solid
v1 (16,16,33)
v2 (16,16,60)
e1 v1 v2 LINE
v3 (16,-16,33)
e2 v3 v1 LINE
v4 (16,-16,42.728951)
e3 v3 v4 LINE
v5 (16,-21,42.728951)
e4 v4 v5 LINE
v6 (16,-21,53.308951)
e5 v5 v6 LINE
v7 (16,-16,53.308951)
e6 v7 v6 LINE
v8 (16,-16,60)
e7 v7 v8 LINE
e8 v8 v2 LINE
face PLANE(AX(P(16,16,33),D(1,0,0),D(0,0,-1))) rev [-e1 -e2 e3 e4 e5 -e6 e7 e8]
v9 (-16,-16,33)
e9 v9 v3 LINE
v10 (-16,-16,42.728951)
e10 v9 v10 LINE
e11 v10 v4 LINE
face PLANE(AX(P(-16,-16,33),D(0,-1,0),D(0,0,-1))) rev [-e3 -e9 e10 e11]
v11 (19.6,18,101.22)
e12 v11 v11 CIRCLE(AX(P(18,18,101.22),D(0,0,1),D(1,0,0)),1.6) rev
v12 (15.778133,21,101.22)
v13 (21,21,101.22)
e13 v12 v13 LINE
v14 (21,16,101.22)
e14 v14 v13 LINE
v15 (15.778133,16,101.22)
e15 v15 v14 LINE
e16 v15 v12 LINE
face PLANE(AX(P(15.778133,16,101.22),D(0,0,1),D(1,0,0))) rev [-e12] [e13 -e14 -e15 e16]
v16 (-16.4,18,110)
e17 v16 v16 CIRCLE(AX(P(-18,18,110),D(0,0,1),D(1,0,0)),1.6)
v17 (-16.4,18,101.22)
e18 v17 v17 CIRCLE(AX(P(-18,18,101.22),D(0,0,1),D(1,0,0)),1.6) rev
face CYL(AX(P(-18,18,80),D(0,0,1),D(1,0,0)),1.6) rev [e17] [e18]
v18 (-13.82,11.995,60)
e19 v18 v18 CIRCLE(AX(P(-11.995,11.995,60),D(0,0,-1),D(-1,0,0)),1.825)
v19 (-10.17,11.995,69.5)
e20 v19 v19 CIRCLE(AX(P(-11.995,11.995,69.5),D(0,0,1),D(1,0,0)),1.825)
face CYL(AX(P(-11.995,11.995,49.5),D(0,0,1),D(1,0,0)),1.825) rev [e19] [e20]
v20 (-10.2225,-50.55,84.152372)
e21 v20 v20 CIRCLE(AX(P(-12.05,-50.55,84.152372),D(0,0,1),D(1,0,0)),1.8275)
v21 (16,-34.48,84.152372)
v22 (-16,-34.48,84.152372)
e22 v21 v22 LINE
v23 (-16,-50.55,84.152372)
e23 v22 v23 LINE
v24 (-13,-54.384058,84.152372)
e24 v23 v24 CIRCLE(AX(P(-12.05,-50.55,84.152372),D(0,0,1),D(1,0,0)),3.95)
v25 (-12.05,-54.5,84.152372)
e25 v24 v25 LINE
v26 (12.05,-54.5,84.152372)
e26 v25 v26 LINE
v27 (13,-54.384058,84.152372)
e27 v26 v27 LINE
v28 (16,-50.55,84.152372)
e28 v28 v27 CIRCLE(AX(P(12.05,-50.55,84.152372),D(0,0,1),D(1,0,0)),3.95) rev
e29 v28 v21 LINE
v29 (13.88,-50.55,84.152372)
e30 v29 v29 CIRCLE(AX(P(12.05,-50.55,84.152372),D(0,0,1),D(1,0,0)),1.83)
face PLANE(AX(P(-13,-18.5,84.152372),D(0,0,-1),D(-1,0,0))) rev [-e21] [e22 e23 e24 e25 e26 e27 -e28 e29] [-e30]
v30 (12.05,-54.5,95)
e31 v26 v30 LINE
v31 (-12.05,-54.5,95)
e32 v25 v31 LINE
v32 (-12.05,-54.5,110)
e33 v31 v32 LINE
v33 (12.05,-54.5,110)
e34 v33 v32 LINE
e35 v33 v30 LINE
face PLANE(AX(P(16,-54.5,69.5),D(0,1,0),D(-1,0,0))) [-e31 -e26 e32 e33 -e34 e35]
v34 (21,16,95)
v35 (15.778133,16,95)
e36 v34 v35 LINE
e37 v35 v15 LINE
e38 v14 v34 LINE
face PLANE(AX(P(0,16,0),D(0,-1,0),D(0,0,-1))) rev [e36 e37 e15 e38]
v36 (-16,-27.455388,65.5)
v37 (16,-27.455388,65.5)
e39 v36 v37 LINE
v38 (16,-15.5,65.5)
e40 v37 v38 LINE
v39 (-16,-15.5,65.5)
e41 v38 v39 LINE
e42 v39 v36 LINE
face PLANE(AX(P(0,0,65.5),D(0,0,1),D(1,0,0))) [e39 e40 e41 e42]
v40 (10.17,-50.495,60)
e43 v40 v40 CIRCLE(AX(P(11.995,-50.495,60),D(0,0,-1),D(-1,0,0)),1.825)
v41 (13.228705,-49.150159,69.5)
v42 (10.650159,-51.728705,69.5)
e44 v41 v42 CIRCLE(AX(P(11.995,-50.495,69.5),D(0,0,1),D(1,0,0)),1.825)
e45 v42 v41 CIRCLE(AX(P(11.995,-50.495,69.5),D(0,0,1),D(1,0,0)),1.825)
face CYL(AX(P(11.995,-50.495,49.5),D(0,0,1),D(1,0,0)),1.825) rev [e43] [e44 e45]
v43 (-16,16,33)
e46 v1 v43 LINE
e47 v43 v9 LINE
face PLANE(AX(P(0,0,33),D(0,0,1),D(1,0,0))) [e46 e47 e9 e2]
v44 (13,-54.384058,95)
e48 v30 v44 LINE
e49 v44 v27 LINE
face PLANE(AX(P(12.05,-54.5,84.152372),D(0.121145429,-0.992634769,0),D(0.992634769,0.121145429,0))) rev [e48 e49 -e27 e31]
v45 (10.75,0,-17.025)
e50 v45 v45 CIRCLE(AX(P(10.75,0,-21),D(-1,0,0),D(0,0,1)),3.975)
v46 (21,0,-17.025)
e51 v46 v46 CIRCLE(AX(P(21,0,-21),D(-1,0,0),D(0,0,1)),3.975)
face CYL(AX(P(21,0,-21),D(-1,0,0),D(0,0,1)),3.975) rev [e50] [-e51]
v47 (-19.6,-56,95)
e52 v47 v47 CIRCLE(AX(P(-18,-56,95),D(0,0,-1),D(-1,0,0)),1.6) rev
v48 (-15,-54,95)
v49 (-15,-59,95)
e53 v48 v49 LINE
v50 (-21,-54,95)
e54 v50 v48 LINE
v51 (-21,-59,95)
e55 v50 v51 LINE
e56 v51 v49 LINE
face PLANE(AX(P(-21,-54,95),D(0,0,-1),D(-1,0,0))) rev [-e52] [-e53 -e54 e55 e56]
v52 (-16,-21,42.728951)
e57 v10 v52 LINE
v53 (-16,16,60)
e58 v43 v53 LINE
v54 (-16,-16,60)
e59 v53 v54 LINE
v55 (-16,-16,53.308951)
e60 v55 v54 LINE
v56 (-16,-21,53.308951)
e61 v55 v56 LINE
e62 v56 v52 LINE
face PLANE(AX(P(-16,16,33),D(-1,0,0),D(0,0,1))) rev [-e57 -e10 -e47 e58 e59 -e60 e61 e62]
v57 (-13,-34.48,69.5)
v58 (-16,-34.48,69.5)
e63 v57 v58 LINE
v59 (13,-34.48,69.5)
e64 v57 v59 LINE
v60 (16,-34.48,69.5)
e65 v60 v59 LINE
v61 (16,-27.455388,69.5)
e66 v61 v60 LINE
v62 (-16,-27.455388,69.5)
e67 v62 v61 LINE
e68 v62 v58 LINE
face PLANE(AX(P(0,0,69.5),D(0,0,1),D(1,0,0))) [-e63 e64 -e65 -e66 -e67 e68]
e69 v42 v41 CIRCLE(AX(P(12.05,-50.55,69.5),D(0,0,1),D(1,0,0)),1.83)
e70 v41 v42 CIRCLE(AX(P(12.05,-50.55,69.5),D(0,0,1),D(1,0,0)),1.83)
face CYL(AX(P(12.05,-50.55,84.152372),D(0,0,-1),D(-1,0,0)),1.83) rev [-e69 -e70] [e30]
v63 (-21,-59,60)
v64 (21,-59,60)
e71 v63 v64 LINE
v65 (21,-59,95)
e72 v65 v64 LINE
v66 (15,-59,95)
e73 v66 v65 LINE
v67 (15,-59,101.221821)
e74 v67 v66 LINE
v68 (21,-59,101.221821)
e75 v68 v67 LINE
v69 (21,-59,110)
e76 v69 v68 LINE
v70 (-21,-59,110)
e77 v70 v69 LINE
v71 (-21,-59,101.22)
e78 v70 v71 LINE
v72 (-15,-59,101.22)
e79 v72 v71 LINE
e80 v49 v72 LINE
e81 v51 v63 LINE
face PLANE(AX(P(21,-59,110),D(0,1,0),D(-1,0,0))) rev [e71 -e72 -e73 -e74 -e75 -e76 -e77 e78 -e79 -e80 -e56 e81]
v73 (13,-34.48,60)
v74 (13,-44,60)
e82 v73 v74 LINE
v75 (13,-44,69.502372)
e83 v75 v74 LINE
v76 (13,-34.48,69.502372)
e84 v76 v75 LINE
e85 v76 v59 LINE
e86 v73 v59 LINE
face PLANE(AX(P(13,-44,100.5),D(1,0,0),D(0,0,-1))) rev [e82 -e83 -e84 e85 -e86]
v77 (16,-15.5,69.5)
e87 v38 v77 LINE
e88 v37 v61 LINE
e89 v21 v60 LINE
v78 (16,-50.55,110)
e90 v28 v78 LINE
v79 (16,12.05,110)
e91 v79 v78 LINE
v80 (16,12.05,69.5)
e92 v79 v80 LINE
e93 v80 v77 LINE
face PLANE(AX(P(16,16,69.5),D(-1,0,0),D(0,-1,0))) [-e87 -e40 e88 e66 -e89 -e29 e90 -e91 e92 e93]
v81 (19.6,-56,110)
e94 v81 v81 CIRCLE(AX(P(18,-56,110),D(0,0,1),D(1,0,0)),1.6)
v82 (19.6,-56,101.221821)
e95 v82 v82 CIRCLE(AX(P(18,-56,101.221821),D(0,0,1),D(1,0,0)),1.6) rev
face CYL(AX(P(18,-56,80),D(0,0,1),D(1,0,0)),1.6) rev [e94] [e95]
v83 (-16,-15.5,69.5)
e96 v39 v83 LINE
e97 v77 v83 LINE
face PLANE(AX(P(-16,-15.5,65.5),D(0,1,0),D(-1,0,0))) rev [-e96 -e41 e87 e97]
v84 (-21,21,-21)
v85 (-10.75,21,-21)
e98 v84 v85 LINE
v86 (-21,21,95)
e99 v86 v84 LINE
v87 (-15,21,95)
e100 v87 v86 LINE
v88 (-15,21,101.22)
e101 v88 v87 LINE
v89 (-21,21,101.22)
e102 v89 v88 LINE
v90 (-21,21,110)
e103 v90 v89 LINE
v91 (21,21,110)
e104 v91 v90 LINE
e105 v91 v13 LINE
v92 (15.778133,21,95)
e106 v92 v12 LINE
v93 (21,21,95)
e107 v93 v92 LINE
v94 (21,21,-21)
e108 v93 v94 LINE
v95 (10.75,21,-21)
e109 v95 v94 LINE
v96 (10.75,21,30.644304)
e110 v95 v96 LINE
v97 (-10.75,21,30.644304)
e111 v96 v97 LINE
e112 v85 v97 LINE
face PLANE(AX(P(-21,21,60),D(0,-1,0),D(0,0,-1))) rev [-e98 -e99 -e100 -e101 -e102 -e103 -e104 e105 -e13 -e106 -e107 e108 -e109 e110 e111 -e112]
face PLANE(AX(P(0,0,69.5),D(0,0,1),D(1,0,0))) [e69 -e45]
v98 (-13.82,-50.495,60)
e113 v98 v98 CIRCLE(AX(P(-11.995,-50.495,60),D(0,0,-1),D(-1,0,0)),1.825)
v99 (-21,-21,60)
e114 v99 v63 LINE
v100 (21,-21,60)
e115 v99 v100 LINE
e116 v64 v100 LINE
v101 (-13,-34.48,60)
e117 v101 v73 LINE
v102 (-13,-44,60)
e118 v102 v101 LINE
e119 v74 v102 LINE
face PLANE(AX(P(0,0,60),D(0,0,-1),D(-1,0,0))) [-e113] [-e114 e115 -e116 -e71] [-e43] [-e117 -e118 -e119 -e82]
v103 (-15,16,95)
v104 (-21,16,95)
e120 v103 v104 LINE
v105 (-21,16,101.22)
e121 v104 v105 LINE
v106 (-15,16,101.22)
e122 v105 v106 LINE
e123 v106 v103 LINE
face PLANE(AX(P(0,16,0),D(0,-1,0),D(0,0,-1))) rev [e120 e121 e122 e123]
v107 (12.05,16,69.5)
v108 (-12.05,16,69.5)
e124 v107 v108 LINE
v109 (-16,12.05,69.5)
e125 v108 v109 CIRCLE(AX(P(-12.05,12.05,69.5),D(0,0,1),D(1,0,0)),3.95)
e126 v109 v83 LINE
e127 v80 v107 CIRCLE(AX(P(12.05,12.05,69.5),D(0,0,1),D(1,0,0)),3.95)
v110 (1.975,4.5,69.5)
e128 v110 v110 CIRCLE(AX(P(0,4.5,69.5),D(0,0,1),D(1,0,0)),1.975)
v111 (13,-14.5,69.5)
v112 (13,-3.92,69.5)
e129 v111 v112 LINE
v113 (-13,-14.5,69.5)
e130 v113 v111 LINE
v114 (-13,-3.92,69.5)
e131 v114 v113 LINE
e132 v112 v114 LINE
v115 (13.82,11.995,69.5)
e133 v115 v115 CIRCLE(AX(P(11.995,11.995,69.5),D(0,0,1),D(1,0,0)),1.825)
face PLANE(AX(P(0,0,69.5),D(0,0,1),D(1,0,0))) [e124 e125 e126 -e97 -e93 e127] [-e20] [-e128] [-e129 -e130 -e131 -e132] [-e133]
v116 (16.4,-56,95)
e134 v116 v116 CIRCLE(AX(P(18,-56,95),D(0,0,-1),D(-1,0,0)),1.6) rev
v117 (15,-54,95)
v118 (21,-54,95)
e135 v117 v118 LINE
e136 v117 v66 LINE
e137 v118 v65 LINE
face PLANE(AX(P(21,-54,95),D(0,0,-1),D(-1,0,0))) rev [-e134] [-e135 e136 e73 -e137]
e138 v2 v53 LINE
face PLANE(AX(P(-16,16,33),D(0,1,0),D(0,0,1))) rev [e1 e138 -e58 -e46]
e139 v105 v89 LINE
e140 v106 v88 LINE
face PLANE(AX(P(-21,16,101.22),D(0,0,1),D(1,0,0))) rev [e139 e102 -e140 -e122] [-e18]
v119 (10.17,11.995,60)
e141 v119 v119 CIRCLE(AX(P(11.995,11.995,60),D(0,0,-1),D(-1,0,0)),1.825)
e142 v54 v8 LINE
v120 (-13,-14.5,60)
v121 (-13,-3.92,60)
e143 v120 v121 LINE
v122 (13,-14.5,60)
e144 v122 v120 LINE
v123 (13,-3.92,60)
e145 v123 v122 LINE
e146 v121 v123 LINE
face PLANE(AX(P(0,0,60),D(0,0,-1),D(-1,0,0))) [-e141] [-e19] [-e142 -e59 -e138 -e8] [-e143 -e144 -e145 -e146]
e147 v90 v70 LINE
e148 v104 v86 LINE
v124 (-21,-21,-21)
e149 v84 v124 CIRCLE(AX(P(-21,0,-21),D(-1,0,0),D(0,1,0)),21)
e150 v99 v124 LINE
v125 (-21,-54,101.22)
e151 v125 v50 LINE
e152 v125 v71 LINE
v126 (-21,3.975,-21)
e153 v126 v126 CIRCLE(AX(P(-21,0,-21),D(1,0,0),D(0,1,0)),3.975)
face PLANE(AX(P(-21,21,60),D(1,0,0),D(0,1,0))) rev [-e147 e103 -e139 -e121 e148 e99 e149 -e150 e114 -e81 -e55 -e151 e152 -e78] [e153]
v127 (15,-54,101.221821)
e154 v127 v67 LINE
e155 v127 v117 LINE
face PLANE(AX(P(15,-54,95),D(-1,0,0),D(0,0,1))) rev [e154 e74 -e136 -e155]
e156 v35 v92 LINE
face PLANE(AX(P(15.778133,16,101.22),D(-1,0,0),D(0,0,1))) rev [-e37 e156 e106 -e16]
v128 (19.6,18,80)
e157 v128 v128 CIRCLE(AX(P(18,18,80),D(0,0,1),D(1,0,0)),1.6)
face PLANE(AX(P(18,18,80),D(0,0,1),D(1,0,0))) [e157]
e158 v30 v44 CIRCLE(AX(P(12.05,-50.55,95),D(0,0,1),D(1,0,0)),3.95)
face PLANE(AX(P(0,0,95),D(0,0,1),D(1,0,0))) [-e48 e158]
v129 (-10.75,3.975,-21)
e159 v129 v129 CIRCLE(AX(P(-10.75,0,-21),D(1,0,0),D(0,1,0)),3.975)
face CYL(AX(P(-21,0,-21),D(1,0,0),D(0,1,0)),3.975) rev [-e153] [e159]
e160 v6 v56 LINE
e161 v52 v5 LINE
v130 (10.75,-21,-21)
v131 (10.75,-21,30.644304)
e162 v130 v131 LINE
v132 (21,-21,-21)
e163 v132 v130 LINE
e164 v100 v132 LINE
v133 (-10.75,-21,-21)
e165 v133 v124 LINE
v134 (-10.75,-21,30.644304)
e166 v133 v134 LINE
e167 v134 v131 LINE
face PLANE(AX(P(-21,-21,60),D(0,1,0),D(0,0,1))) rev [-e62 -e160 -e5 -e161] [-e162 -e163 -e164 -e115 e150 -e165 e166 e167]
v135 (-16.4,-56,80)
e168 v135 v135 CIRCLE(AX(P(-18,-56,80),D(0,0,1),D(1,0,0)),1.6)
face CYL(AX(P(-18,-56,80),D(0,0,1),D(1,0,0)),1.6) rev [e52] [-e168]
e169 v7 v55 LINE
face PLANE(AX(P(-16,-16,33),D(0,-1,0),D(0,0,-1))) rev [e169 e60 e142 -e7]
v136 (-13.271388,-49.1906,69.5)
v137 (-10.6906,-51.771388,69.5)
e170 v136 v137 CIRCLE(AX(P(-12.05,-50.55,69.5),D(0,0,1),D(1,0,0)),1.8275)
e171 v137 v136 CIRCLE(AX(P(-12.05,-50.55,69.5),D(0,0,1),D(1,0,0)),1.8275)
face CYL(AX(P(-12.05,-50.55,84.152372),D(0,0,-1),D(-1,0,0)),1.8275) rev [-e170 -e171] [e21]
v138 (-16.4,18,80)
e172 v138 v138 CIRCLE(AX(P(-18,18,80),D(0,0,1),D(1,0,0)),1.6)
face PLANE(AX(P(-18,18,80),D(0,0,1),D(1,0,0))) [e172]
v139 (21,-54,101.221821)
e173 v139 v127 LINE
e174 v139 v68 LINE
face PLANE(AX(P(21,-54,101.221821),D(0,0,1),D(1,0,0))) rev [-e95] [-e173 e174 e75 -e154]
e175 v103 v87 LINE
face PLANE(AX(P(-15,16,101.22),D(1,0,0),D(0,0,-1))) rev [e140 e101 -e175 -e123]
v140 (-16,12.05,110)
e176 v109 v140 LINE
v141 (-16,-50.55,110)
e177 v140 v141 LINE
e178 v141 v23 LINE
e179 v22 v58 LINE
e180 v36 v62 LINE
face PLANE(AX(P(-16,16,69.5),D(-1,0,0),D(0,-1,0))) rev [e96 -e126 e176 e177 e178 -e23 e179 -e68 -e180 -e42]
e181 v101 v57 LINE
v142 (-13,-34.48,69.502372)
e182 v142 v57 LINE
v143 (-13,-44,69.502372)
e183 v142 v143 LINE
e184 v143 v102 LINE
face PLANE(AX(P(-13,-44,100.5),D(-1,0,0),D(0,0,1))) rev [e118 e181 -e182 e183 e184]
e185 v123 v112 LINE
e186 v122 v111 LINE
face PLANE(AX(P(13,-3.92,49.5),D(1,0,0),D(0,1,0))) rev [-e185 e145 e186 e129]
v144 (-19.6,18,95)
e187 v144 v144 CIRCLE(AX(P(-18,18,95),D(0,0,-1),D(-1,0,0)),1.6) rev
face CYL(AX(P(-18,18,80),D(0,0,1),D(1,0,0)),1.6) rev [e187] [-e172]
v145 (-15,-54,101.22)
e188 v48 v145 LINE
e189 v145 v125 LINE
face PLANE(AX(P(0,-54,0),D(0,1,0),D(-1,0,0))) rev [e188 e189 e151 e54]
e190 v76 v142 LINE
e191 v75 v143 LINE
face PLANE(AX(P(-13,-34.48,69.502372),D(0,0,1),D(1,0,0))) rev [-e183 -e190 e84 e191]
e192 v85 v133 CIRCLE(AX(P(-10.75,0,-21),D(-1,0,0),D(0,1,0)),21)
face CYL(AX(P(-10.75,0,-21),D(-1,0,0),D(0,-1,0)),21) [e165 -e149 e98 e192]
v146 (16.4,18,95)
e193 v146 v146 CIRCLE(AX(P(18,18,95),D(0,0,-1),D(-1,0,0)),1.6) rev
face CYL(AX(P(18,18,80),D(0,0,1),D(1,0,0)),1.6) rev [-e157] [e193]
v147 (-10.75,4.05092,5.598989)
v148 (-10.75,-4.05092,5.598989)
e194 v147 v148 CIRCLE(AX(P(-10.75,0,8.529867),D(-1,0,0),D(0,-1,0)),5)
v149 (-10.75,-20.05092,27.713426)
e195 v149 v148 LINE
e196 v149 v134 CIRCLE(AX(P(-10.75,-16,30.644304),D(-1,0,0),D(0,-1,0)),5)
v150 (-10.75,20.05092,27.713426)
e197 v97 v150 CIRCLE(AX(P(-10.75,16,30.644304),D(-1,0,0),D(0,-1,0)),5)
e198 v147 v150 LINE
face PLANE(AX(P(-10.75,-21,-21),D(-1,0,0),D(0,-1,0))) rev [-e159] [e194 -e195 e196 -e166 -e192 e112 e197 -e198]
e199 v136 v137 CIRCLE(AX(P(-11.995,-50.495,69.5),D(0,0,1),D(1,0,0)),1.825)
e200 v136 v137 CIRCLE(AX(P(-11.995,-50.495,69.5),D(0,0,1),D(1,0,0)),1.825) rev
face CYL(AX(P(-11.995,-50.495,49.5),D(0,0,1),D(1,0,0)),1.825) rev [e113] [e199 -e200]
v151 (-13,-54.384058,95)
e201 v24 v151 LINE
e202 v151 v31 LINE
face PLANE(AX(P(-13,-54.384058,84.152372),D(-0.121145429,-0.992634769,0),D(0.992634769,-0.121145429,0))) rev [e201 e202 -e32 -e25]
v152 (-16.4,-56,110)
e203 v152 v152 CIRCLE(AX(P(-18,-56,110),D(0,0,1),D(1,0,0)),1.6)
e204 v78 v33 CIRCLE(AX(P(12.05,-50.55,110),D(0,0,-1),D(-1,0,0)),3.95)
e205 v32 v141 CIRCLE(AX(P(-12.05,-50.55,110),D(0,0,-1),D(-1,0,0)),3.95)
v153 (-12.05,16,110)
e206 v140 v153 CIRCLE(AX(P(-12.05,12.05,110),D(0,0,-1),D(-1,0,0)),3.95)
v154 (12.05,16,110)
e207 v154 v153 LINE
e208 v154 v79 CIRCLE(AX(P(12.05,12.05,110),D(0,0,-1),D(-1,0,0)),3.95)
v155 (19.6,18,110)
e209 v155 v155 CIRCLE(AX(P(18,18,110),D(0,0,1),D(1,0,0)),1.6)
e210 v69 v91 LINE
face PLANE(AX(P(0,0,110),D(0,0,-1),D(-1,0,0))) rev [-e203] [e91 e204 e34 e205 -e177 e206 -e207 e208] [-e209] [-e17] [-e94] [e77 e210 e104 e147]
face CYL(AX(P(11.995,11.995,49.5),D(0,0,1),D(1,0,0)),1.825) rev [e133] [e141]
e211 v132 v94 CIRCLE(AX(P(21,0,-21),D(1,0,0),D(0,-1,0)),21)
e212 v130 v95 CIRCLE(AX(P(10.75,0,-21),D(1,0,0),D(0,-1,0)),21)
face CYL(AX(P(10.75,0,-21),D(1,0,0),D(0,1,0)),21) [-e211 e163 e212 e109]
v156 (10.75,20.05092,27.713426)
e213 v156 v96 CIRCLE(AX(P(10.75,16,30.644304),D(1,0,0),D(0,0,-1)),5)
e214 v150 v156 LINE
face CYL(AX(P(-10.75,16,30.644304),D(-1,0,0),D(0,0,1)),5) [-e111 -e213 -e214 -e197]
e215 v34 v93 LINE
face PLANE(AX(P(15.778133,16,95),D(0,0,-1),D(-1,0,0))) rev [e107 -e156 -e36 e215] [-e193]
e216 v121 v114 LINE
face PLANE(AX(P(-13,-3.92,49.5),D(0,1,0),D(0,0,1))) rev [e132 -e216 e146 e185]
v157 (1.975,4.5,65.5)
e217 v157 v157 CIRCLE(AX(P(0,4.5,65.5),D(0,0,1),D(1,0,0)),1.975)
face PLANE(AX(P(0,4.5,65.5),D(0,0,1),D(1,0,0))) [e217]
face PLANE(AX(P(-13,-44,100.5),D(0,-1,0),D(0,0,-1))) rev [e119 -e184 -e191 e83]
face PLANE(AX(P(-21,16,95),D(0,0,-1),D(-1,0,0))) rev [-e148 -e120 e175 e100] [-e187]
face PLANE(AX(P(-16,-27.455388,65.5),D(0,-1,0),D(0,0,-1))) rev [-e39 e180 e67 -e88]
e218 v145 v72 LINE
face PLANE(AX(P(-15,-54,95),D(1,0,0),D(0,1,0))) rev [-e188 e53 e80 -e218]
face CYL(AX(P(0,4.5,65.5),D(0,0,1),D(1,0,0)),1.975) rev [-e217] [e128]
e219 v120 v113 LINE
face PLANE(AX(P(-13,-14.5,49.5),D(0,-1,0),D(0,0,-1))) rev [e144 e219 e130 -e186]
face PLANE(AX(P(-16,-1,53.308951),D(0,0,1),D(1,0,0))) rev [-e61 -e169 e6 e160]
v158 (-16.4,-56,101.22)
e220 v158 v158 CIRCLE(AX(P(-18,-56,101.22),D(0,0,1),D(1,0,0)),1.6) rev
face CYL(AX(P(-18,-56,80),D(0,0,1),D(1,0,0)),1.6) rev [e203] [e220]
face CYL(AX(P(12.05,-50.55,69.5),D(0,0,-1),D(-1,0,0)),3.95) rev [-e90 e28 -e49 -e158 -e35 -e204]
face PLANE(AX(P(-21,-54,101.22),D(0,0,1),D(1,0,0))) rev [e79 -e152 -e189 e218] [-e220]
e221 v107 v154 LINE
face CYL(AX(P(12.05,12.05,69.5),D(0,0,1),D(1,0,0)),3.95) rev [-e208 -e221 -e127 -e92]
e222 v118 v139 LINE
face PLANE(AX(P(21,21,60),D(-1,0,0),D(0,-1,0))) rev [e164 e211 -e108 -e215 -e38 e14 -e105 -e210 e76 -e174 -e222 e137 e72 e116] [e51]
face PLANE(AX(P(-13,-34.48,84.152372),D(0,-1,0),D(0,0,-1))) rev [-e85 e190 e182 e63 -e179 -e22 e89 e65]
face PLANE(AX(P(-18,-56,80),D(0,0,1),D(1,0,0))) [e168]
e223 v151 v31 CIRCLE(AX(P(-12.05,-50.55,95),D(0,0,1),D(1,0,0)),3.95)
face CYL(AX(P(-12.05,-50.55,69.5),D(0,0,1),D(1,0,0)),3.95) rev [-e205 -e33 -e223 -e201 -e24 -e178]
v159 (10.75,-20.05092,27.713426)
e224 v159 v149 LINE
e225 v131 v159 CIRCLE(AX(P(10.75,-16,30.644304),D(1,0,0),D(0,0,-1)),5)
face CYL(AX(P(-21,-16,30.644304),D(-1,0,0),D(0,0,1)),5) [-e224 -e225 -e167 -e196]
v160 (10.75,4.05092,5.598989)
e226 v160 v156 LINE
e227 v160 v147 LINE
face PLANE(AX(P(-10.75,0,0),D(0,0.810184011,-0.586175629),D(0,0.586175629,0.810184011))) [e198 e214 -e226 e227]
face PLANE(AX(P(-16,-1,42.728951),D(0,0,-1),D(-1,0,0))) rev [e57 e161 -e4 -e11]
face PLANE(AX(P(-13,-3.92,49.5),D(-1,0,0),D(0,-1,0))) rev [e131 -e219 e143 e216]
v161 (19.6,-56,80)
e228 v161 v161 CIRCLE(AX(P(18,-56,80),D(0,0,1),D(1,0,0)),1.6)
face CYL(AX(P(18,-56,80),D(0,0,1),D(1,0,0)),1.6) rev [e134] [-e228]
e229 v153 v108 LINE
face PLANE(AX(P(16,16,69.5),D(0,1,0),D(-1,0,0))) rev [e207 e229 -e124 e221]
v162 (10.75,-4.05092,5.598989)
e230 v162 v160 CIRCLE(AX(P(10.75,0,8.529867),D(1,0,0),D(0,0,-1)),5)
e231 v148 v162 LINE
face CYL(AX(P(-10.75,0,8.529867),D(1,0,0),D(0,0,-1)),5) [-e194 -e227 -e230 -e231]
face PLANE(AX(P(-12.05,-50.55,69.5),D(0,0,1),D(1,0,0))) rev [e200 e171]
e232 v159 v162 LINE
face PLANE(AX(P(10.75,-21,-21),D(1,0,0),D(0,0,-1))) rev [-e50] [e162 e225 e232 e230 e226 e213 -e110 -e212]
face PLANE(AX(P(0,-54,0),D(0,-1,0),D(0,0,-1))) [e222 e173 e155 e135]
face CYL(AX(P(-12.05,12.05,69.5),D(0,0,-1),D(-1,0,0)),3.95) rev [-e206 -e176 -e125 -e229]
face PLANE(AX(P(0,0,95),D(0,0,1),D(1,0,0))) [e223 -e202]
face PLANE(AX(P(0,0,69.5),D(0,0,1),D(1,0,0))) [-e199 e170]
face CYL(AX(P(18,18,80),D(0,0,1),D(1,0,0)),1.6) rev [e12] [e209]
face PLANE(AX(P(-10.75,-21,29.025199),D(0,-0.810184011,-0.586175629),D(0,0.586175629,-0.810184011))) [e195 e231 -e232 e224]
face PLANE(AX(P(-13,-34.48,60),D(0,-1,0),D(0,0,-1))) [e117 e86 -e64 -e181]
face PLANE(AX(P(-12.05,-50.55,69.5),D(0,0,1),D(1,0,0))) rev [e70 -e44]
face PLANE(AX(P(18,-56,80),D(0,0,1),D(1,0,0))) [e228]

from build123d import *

# Parameters (mm, degrees)
SKETCH2_W            = 42
SKETCH2_H            = 42
BOSS_EXTRUDE1_DEPTH  = 60
SKETCH3_W            = 10.25
SKETCH3_H            = 42
BOSS_EXTRUDE2_DEPTH  = 21
BOSS_EXTRUDE3_DEPTH  = 10.25
BOSS_EXTRUDE4_START  = -10.25
BOSS_EXTRUDE4_DEPTH  = 10.25
SKETCH6_W            = 32
SKETCH6_H            = 32
CUT_EXTRUDE1_DEPTH   = 27
SKETCH7_R            = 3.975
CUT_EXTRUDE2_DEPTH   = 72.056755485
SKETCH9_R            = 3.975
CUT_EXTRUDE3_DEPTH   = 72.056755485
CUT_EXTRUDE5_DEPTH   = 21.5
FILLET1_R            = 5
FILLET2_R            = 5
FILLET3_R            = 5
SKETCH12_W           = 42
SKETCH12_H           = 80
BOSS_EXTRUDE5_DEPTH  = 50
SKETCH13_W           = 32
SKETCH13_H           = 70.5
CUT_EXTRUDE7_DEPTH   = 40.5
SKETCH14_W           = 26
SKETCH14_H           = 10.847627818
CUT_EXTRUDE8_DEPTH   = 40.5
SKETCH15_W           = 26
SKETCH15_H           = 10.58
CUT_EXTRUDE9_DEPTH   = 40.5
FILLET4_R            = 3.95
SKETCH16_R           = 1.825
CUT_EXTRUDE10_DEPTH  = 20
SKETCH18_R           = 1.83
SKETCH18_R_2         = 1.8275
BOSS_EXTRUDE7_DEPTH  = 14.652372
SKETCH19_R           = 1.6
CUT_EXTRUDE11_DEPTH  = 30
SKETCH23_W           = 6
SKETCH23_H           = 6.221820756
CUT_EXTRUDE14_DEPTH  = 5
SKETCH25_W           = 6
SKETCH25_H           = 6.22
CUT_EXTRUDE15_DEPTH  = 5
SKETCH26_W           = 6
SKETCH26_H           = 6.22
SKETCH26_W_2         = 5.221866826
CUT_EXTRUDE16_DEPTH  = 5
SKETCH27_R           = 1.975
CUT_EXTRUDE17_DEPTH  = 4
SKETCH28_W           = 32
SKETCH28_H           = 11.955388495
CUT_EXTRUDE18_DEPTH  = 4
BOSS_EXTRUDE8_DEPTH  = 10.847628
SKETCH30_W           = 26
SKETCH30_H           = 10.58
CUT_EXTRUDE19_DEPTH  = 20
SKETCH31_W           = 32
SKETCH31_H           = 10.58
CUT_EXTRUDE20_DEPTH  = 20
SKETCH32_W           = 26
SKETCH32_H           = 14.65
BOSS_EXTRUDE9_DEPTH  = 9.52
BOSS_EXTRUDE10_START = -9.5
SKETCH33_W           = 26
SKETCH33_H           = 1.06
BOSS_EXTRUDE10_DEPTH = 9.5


with BuildPart() as part:
    # Sketch2 → Boss-Extrude1 (new body)
    with BuildSketch(Plane.XY):
        Rectangle(SKETCH2_W, SKETCH2_H)
    extrude(amount=BOSS_EXTRUDE1_DEPTH)

    # Sketch3 → Boss-Extrude2 (add)
    with BuildSketch(Plane(origin=(0, 0, 0), x_dir=(-1, 0, 0), z_dir=(0, 0, -1))):
        with Locations((15.875, 0)):
            Rectangle(SKETCH3_W, SKETCH3_H)
        with Locations((-15.875, 0)):
            Rectangle(SKETCH3_W, SKETCH3_H)
    extrude(amount=BOSS_EXTRUDE2_DEPTH)

    # Sketch4 → Boss-Extrude3 (add)
    with BuildSketch(Plane.ZY.offset(21)):
        with BuildLine():
            Line((-21, -21), (-21, 21))
            ThreePointArc((-21, 21), (-42, 0), (-21, -21))
        make_face()
    extrude(amount=-BOSS_EXTRUDE3_DEPTH)

    # Sketch5 → Boss-Extrude4 (add)
    with BuildSketch(Plane(origin=(21, 0, 0), x_dir=(0, 0, -1), z_dir=(1, 0, 0)).offset(BOSS_EXTRUDE4_START)):
        with BuildLine():
            Line((21, 21), (21, -21))
            ThreePointArc((21, -21), (42, 0), (21, 21))
        make_face()
    extrude(amount=BOSS_EXTRUDE4_DEPTH)

    # Sketch6 → Cut-Extrude1 (cut)
    with BuildSketch(Plane.XY.offset(60)):
        Rectangle(SKETCH6_W, SKETCH6_H)
    extrude(amount=-CUT_EXTRUDE1_DEPTH, mode=Mode.SUBTRACT)

    # Sketch7 → Cut-Extrude2 (cut, through all)
    with BuildSketch(Plane.ZY.offset(-10.75)):
        with Locations((-21, 0)):
            Circle(SKETCH7_R)
    extrude(amount=-CUT_EXTRUDE2_DEPTH, mode=Mode.SUBTRACT)

    # Sketch9 → Cut-Extrude3 (cut, through all)
    with BuildSketch(Plane(origin=(-10.75, 0, 0), x_dir=(0, 0, -1), z_dir=(1, 0, 0))):
        with Locations(Location((21, 0, 0), (0, 0, 180))):
            Circle(SKETCH9_R)
    extrude(amount=-CUT_EXTRUDE3_DEPTH, mode=Mode.SUBTRACT)

    # Sketch11 → Cut-Extrude5 (cut)
    with BuildSketch(Plane.ZY.offset(-10.75)):
        Polygon((0, 21), (0, 0), (29.025198915, 21), align=None)
        Polygon((0, 0), (0, -21), (29.025198915, -21), align=None)
    extrude(amount=CUT_EXTRUDE5_DEPTH, mode=Mode.SUBTRACT)

    # Fillet1
    fillet1_edges = [part.edges().sort_by_distance(p)[0] for p in [
        (0, 0, 0),
    ]]
    fillet(fillet1_edges, radius=FILLET1_R)

    # Fillet2
    fillet2_edges = [part.edges().sort_by_distance(p)[0] for p in [
        (0, -21, 29.025198915),
    ]]
    fillet(fillet2_edges, radius=FILLET2_R)

    # Fillet3
    fillet3_edges = [part.edges().sort_by_distance(p)[0] for p in [
        (0, 21, 29.025198915),
    ]]
    fillet(fillet3_edges, radius=FILLET3_R)

    # Sketch12 → Boss-Extrude5 (add)
    with BuildSketch(Plane.XY.offset(60)):
        with Locations((0, -19)):
            Rectangle(SKETCH12_W, SKETCH12_H)
    extrude(amount=BOSS_EXTRUDE5_DEPTH)

    # Sketch13 → Cut-Extrude7 (cut)
    with BuildSketch(Plane.XY.offset(110)):
        with Locations((0, -19.25)):
            Rectangle(SKETCH13_W, SKETCH13_H)
    extrude(amount=-CUT_EXTRUDE7_DEPTH, mode=Mode.SUBTRACT)

    # Sketch14 → Cut-Extrude8 (cut)
    with BuildSketch(Plane(origin=(0, -59, 0), x_dir=(-1, 0, 0), z_dir=(0, -1, 0))):
        with Locations((0, -89.576186091)):
            Rectangle(SKETCH14_W, SKETCH14_H)
    extrude(amount=-CUT_EXTRUDE8_DEPTH, mode=Mode.SUBTRACT)

    # Sketch15 → Cut-Extrude9 (cut)
    with BuildSketch(Plane(origin=(0, 0, 60), x_dir=(-1, 0, 0), z_dir=(0, 0, -1))):
        with Locations((0, -38.71)):
            Rectangle(SKETCH15_W, SKETCH15_H)
    extrude(amount=-CUT_EXTRUDE9_DEPTH, mode=Mode.SUBTRACT)

    # Fillet4
    # the kernel refuses this fillet: 3.95 mm, written as the material it adds along each edge
    with BuildSketch(Plane(origin=(-16, -54.5, 110), x_dir=(0, 1, 0), z_dir=(0, 0, -1))) as fillet4_piece_1_section:
        with BuildLine():
            CenterArc((FILLET4_R, FILLET4_R), FILLET4_R, 180, 90)
            Line((0, FILLET4_R), (0, 0))
            Line((0, 0), (FILLET4_R, 0))
        make_face()
    fillet4_piece_1 = extrude(amount=40.5, mode=Mode.PRIVATE)
    fillet4_piece_1 = split(fillet4_piece_1, bisect_by=Plane(origin=(-13, -53.608355885, 102.5), z_dir=(-1, 0, 0)), keep=Keep.TOP, mode=Mode.PRIVATE)
    add(fillet4_piece_1)
    with BuildSketch(Plane(origin=(-16, -54.5, 110), x_dir=(0, 1, 0), z_dir=(0, 0, -1))) as fillet4_piece_2_section:
        with BuildLine():
            CenterArc((FILLET4_R, FILLET4_R), FILLET4_R, 180, 90)
            Line((0, FILLET4_R), (0, 0))
            Line((0, 0), (FILLET4_R, 0))
        make_face()
    fillet4_piece_2 = extrude(amount=50.375, mode=Mode.PRIVATE)
    fillet4_piece_2 = split(fillet4_piece_2, bisect_by=Plane(origin=(-12.763202693, -54.465306666, 95), z_dir=(0, 0, 1)), keep=Keep.TOP, mode=Mode.PRIVATE)
    add(fillet4_piece_2)
    with BuildSketch(Plane(origin=(-16, -54.5, 119.875), x_dir=(0, 1, 0), z_dir=(0, 0, -1))) as fillet4_piece_3_section:
        with BuildLine():
            CenterArc((FILLET4_R, FILLET4_R), FILLET4_R, 180, 90)
            Line((0, FILLET4_R), (0, 0))
            Line((0, 0), (FILLET4_R, 0))
        make_face()
    fillet4_piece_3 = extrude(amount=50.375, mode=Mode.PRIVATE)
    fillet4_piece_3 = split(fillet4_piece_3, bisect_by=Plane(origin=(-12.763202693, -54.465306666, 84.152372182), z_dir=(0, 0, -1)), keep=Keep.TOP, mode=Mode.PRIVATE)
    add(fillet4_piece_3)
    with BuildSketch(Plane(origin=(16, -54.5, 110), x_dir=(-1, 0, 0), z_dir=(0, 0, -1))) as fillet4_piece_4_section:
        with BuildLine():
            CenterArc((FILLET4_R, FILLET4_R), FILLET4_R, 180, 90)
            Line((0, FILLET4_R), (0, 0))
            Line((0, 0), (FILLET4_R, 0))
        make_face()
    fillet4_piece_4 = extrude(amount=50.375, mode=Mode.PRIVATE)
    fillet4_piece_4 = split(fillet4_piece_4, bisect_by=Plane(origin=(12.763202693, -54.465306666, 95), z_dir=(0, 0, 1)), keep=Keep.TOP, mode=Mode.PRIVATE)
    add(fillet4_piece_4)
    with BuildSketch(Plane(origin=(16, -54.5, 119.875), x_dir=(-1, 0, 0), z_dir=(0, 0, -1))) as fillet4_piece_5_section:
        with BuildLine():
            CenterArc((FILLET4_R, FILLET4_R), FILLET4_R, 180, 90)
            Line((0, FILLET4_R), (0, 0))
            Line((0, 0), (FILLET4_R, 0))
        make_face()
    fillet4_piece_5 = extrude(amount=50.375, mode=Mode.PRIVATE)
    fillet4_piece_5 = split(fillet4_piece_5, bisect_by=Plane(origin=(15.143643425, -53.608355885, 95), z_dir=(0, 0, -1)), keep=Keep.TOP, mode=Mode.PRIVATE)
    fillet4_piece_5 = split(fillet4_piece_5, bisect_by=Plane(origin=(13, -53.608355885, 89.576186091), z_dir=(1, 0, 0)), keep=Keep.TOP, mode=Mode.PRIVATE)
    add(fillet4_piece_5)
    with BuildSketch(Plane(origin=(16, -54.5, 119.875), x_dir=(-1, 0, 0), z_dir=(0, 0, -1))) as fillet4_piece_6_section:
        with BuildLine():
            CenterArc((FILLET4_R, FILLET4_R), FILLET4_R, 180, 90)
            Line((0, FILLET4_R), (0, 0))
            Line((0, 0), (FILLET4_R, 0))
        make_face()
    fillet4_piece_6 = extrude(amount=50.375, mode=Mode.PRIVATE)
    fillet4_piece_6 = split(fillet4_piece_6, bisect_by=Plane(origin=(12.763202693, -54.465306666, 84.152372182), z_dir=(0, 0, -1)), keep=Keep.TOP, mode=Mode.PRIVATE)
    add(fillet4_piece_6)
    with BuildSketch(Plane(origin=(-16, 16, 110), x_dir=(1, 0, 0), z_dir=(0, 0, -1))) as fillet4_piece_7_section:
        with BuildLine():
            CenterArc((FILLET4_R, FILLET4_R), FILLET4_R, 180, 90)
            Line((0, FILLET4_R), (0, 0))
            Line((0, 0), (FILLET4_R, 0))
        make_face()
    fillet4_piece_7 = extrude(amount=50.375, mode=Mode.PRIVATE)
    fillet4_piece_7 = split(fillet4_piece_7, bisect_by=Plane(origin=(-15.117696641, 15.117696641, 60), z_dir=(0, 0, 1)), keep=Keep.TOP, mode=Mode.PRIVATE)
    add(fillet4_piece_7)
    with BuildSketch(Plane(origin=(16, 16, 110), x_dir=(-1, 0, 0), z_dir=(0, 0, -1))) as fillet4_piece_8_section:
        with BuildLine():
            CenterArc((FILLET4_R, -FILLET4_R), FILLET4_R, 90, 90)
            Line((0, -FILLET4_R), (0, 0))
            Line((0, 0), (FILLET4_R, 0))
        make_face()
    fillet4_piece_8 = extrude(amount=50.375, mode=Mode.PRIVATE)
    fillet4_piece_8 = split(fillet4_piece_8, bisect_by=Plane(origin=(15.117696641, 15.117696641, 60), z_dir=(0, 0, 1)), keep=Keep.TOP, mode=Mode.PRIVATE)
    add(fillet4_piece_8)

    # Sketch16 → Cut-Extrude10 (cut)
    with BuildSketch(Plane.XY.offset(69.5)):
        with Locations((11.995, 11.995)):
            Circle(SKETCH16_R)
        with Locations((-11.995, 11.995)):
            Circle(SKETCH16_R)
        with Locations((-11.995, -50.495)):
            Circle(SKETCH16_R)
        with Locations((11.995, -50.495)):
            Circle(SKETCH16_R)
    extrude(amount=-CUT_EXTRUDE10_DEPTH, mode=Mode.SUBTRACT)

    # Sketch18 → Boss-Extrude7 (add)
    with BuildSketch(Plane.XY.offset(69.5)):
        with BuildLine():
            Line((-13, -34.48), (-13, -44))
            Line((-13, -44), (13, -44))
            Line((13, -44), (13, -34.48))
            Line((13, -34.48), (16, -34.48))
            Line((16, -34.48), (16, -50.55))
            ThreePointArc((16, -50.55), (14.843071786, -53.343071786), (12.05, -54.5))
            Line((12.05, -54.5), (-12.05, -54.5))
            ThreePointArc((-12.05, -54.5), (-14.843071786, -53.343071786), (-16, -50.55))
            Line((-16, -50.55), (-16, -34.48))
            Line((-16, -34.48), (-13, -34.48))
        make_face()
        with Locations(Location((12.05, -50.55, 0), (0, 0, 220.098301437))):
            Circle(SKETCH18_R, mode=Mode.SUBTRACT)
        with Locations(Location((-12.05, -50.55, 0), (0, 0, 131.93894089))):
            Circle(SKETCH18_R_2, mode=Mode.SUBTRACT)
    extrude(amount=BOSS_EXTRUDE7_DEPTH)

    # Sketch19 → Cut-Extrude11 (cut)
    with BuildSketch(Plane.XY.offset(110)):
        with Locations((18, 18)):
            Circle(SKETCH19_R)
        with Locations((-18, 18)):
            Circle(SKETCH19_R)
        with Locations((-18, -56)):
            Circle(SKETCH19_R)
        with Locations((18, -56)):
            Circle(SKETCH19_R)
    extrude(amount=-CUT_EXTRUDE11_DEPTH, mode=Mode.SUBTRACT)

    # Sketch23 → Cut-Extrude14 (cut)
    with BuildSketch(Plane(origin=(0, -59, 0), x_dir=(-1, 0, 0), z_dir=(0, -1, 0))):
        with Locations((-18, -98.110910378)):
            Rectangle(SKETCH23_W, SKETCH23_H)
    extrude(amount=-CUT_EXTRUDE14_DEPTH, mode=Mode.SUBTRACT)

    # Sketch25 → Cut-Extrude15 (cut)
    with BuildSketch(Plane(origin=(0, -59, 0), x_dir=(-1, 0, 0), z_dir=(0, -1, 0))):
        with Locations((18, -98.11)):
            Rectangle(SKETCH25_W, SKETCH25_H)
    extrude(amount=-CUT_EXTRUDE15_DEPTH, mode=Mode.SUBTRACT)

    # Sketch26 → Cut-Extrude16 (cut)
    with BuildSketch(Plane(origin=(0, 21, 0), x_dir=(1, 0, 0), z_dir=(0, 1, 0))):
        with Locations((-18, -98.11)):
            Rectangle(SKETCH26_W, SKETCH26_H)
        with Locations((18.389066587, -98.11)):
            Rectangle(SKETCH26_W_2, SKETCH26_H)
    extrude(amount=-CUT_EXTRUDE16_DEPTH, mode=Mode.SUBTRACT)

    # Sketch27 → Cut-Extrude17 (cut)
    with BuildSketch(Plane.XY.offset(69.5)):
        with Locations((0, 4.5)):
            Circle(SKETCH27_R)
    extrude(amount=-CUT_EXTRUDE17_DEPTH, mode=Mode.SUBTRACT)

    # Sketch28 → Cut-Extrude18 (cut)
    with BuildSketch(Plane.XY.offset(69.5)):
        with Locations((0, -21.477694248)):
            Rectangle(SKETCH28_W, SKETCH28_H)
    extrude(amount=-CUT_EXTRUDE18_DEPTH, mode=Mode.SUBTRACT)

    # Sketch29 → Boss-Extrude8 (add)
    with BuildSketch(Plane(origin=(0, 0, 95), x_dir=(-1, 0, 0), z_dir=(0, 0, -1))):
        Polygon((13, -59), (-13, -59), (-13, -54.384057903), (-12.05, -54.5), (12.05, -54.5), (13, -54.384057903), align=None)
    extrude(amount=BOSS_EXTRUDE8_DEPTH)

    # Sketch30 → Cut-Extrude19 (cut)
    with BuildSketch(Plane.XY.offset(69.5)):
        with Locations((0, -9.21)):
            Rectangle(SKETCH30_W, SKETCH30_H)
    extrude(amount=-CUT_EXTRUDE19_DEPTH, mode=Mode.SUBTRACT)

    # Sketch31 → Cut-Extrude20 (cut)
    with BuildSketch(Plane(origin=(0, -21, 0), x_dir=(-1, 0, 0), z_dir=(0, -1, 0))):
        with Locations((0, -48.018950811)):
            Rectangle(SKETCH31_W, SKETCH31_H)
    extrude(amount=-CUT_EXTRUDE20_DEPTH, mode=Mode.SUBTRACT)

    # Sketch32 → Boss-Extrude9 (add)
    with BuildSketch(Plane(origin=(0, -44, 0), x_dir=(1, 0, 0), z_dir=(0, 1, 0))):
        with Locations((0, -76.827372182)):
            Rectangle(SKETCH32_W, SKETCH32_H)
    extrude(amount=BOSS_EXTRUDE9_DEPTH)

    # Sketch33 → Boss-Extrude10 (add)
    with BuildSketch(Plane.XY.offset(69.5).offset(BOSS_EXTRUDE10_START)):
        with Locations((0, -33.95)):
            Rectangle(SKETCH33_W, SKETCH33_H)
    extrude(amount=BOSS_EXTRUDE10_DEPTH)


solid = part.part
